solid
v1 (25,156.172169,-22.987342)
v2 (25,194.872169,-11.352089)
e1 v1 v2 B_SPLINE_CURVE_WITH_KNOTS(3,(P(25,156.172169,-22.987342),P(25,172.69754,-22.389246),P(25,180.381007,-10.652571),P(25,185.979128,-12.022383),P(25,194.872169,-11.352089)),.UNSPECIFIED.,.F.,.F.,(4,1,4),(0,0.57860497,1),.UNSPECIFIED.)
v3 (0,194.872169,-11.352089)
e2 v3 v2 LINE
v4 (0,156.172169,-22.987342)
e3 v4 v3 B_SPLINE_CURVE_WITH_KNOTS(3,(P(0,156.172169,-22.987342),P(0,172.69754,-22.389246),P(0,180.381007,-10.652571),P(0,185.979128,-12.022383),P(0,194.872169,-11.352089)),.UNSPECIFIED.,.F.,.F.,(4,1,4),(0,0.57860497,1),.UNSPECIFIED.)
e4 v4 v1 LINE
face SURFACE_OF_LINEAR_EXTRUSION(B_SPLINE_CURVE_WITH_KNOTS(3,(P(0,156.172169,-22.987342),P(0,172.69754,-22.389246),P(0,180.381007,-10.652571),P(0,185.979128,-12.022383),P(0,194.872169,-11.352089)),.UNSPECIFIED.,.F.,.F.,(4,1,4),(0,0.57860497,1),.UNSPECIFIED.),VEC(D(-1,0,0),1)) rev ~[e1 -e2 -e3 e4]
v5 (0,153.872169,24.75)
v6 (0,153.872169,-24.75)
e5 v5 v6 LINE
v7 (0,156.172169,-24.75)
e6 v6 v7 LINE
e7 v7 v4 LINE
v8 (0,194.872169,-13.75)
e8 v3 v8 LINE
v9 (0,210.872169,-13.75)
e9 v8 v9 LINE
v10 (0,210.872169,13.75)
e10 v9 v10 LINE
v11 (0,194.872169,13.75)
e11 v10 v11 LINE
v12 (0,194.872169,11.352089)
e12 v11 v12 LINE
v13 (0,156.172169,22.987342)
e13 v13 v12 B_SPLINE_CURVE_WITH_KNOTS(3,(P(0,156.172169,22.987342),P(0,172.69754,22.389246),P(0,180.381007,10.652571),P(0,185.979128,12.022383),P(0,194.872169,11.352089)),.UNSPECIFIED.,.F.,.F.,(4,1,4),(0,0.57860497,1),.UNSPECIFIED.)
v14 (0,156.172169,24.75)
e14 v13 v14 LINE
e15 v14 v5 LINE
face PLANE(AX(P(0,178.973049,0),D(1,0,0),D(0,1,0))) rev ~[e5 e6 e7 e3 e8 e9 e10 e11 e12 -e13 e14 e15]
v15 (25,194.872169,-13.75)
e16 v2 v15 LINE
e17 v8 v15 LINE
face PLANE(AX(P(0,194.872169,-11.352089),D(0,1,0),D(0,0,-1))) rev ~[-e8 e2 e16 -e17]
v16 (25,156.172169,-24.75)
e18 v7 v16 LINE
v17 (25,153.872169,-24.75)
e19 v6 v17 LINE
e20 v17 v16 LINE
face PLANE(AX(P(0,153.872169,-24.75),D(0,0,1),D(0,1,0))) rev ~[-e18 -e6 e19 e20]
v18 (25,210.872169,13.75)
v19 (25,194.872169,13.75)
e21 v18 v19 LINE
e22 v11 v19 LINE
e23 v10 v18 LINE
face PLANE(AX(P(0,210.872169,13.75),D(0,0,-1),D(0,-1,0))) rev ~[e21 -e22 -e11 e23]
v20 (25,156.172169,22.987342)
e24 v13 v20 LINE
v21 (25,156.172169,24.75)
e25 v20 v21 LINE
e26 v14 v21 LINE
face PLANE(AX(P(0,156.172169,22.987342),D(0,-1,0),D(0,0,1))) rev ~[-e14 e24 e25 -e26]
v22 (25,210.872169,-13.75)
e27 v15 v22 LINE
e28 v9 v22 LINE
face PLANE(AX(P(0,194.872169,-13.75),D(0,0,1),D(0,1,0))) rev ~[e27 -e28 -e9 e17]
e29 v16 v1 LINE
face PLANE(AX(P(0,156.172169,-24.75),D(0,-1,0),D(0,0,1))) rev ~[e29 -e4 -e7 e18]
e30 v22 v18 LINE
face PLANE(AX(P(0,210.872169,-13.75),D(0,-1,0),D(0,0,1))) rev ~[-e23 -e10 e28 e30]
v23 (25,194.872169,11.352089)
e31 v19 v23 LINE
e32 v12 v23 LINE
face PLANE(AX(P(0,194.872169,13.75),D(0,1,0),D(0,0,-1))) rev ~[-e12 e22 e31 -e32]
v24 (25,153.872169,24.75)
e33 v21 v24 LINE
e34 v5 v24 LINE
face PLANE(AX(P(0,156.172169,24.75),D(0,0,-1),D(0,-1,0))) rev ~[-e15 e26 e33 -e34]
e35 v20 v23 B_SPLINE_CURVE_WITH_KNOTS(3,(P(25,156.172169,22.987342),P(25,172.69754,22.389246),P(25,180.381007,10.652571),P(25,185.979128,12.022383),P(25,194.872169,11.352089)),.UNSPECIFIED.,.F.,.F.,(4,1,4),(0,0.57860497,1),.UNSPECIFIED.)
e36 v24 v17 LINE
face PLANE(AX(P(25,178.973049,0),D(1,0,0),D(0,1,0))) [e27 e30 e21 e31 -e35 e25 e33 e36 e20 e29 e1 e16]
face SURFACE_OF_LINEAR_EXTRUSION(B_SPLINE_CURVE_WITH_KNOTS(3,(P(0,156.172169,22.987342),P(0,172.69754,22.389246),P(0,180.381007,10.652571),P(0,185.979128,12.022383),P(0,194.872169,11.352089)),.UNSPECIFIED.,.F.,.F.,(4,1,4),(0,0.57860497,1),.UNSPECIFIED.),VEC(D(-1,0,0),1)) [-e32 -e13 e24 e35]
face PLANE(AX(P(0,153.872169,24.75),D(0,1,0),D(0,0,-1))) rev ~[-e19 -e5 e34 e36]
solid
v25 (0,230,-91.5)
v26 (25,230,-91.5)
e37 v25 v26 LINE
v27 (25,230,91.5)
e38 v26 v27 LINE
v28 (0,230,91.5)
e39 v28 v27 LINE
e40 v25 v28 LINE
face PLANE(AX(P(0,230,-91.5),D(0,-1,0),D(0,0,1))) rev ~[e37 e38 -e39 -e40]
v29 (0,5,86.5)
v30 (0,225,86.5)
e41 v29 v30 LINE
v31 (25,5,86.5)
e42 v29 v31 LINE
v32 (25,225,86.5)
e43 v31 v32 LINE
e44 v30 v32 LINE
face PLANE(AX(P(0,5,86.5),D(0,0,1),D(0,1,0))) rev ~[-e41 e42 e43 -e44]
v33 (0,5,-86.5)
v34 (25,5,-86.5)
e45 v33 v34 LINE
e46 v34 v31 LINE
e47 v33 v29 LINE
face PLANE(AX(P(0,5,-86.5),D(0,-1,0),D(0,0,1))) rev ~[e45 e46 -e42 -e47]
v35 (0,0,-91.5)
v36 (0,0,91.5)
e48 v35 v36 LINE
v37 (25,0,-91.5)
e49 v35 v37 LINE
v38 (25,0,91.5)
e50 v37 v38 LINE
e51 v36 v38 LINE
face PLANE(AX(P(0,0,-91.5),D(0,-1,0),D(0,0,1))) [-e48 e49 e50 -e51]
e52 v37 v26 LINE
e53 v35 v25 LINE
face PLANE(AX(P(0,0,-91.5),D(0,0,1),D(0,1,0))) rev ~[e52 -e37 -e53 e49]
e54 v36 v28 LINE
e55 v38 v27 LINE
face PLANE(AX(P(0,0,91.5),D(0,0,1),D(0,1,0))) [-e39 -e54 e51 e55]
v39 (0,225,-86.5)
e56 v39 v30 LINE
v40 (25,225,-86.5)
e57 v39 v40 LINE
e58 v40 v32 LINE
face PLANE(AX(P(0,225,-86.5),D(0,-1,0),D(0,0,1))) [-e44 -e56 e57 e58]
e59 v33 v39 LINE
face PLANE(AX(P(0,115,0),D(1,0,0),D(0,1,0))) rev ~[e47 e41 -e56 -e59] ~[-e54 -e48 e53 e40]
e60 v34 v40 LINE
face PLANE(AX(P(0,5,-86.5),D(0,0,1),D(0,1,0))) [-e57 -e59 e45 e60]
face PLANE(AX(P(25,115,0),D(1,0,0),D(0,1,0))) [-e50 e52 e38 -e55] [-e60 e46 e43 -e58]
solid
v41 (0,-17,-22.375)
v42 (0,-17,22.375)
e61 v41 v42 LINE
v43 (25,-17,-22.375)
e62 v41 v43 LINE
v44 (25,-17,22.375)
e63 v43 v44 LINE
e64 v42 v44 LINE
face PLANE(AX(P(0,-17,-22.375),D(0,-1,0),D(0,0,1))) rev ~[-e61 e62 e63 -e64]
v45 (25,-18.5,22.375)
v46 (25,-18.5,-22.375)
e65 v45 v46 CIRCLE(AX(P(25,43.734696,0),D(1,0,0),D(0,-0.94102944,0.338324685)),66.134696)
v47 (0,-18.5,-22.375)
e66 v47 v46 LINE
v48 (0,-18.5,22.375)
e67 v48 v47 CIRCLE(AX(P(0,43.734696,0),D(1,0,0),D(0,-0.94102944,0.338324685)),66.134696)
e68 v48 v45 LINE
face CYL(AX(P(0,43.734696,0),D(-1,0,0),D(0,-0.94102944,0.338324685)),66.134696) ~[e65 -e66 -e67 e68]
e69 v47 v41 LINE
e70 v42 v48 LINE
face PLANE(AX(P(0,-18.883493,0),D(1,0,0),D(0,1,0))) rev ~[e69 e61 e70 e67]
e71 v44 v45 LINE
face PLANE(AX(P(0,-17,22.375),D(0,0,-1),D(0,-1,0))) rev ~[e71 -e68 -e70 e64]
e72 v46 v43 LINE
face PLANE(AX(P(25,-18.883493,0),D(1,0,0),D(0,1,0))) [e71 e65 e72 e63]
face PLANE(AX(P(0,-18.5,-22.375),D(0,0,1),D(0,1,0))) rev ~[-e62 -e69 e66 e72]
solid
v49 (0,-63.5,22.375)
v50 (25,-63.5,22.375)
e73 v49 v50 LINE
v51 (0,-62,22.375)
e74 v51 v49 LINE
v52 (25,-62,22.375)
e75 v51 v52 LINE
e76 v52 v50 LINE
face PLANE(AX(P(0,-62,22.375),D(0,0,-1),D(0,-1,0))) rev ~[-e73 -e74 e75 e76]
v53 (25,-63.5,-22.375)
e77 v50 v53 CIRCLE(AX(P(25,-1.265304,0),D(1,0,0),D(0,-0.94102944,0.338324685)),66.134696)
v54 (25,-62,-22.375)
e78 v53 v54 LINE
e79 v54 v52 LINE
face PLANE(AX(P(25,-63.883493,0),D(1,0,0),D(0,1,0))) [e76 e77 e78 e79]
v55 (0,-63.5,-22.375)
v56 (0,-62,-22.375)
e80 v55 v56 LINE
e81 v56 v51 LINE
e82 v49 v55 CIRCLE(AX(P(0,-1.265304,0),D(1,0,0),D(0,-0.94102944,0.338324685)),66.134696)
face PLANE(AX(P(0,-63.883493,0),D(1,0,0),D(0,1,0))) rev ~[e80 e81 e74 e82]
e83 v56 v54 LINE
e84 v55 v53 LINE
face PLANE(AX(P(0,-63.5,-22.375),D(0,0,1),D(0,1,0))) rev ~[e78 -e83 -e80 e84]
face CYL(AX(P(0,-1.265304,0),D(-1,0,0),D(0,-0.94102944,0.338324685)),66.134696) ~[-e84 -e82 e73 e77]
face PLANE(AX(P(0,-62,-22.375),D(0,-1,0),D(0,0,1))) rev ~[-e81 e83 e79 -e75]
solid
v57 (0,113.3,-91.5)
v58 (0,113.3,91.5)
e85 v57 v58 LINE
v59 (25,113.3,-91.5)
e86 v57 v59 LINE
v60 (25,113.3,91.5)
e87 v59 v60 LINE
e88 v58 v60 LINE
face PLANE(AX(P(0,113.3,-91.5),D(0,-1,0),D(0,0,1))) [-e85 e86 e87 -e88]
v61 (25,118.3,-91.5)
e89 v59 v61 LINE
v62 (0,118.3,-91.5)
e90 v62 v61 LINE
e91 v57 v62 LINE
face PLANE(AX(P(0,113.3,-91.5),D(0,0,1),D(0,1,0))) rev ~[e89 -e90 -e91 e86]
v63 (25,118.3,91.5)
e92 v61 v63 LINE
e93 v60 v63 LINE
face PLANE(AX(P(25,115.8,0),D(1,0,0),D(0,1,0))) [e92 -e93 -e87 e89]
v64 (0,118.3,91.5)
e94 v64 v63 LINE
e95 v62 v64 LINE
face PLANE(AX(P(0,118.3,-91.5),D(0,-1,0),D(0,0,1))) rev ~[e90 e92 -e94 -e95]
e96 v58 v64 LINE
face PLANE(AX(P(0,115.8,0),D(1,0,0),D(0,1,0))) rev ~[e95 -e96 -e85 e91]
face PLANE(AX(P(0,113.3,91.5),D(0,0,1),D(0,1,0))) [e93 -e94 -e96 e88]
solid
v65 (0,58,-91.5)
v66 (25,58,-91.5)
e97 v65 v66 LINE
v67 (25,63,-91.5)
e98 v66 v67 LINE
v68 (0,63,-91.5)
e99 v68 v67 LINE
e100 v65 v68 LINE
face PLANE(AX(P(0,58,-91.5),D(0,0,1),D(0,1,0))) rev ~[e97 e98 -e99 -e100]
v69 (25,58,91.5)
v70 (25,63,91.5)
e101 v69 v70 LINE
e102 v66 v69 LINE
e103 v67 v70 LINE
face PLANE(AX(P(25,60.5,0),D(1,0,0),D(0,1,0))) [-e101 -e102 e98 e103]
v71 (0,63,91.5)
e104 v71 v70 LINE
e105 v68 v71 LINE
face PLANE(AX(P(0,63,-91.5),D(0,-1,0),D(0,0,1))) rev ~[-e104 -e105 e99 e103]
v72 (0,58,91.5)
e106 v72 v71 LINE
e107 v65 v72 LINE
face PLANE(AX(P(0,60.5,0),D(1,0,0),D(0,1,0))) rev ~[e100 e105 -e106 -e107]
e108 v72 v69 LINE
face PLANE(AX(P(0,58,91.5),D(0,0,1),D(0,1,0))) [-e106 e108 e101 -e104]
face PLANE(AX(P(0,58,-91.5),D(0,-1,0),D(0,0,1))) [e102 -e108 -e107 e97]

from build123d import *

# Parameters (mm, degrees)
F3_W     = 230
F3_H     = 183
F3_W_2   = 220
F3_H_2   = 173
F4_DEPTH = 25
F5_DEPTH = 25
F6_W     = 5
F6_H     = 183
F7_DEPTH = 25


# Not quite as in the source:
# - the dataset's text gives a spline's control points without its knots; the knots are read off the source's solid


with BuildPart() as f4:
    # F3 (on Right) → F4 (new body)
    with BuildSketch(Plane.YZ):
        with Locations((115, 0)):
            Rectangle(F3_W, F3_H)
        with Locations((115, 0)):
            Rectangle(F3_W_2, F3_H_2, mode=Mode.SUBTRACT)
    extrude(amount=F4_DEPTH)


with BuildPart() as f5:
    # F2 (on Right) → F5 (new body)
    with BuildSketch(Plane.YZ):
        with BuildLine():
            Line((210.8721694193, -13.75), (210.8721694193, 13.75))
            Line((210.8721694193, 13.75), (194.8721694193, 13.75))
            Line((194.8721694193, 13.75), (194.8721694193, 11.3520892337))
            add(Edge.make_bspline(
                [(156.1721694193, 22.9873415195), (172.6975398433, 22.3892458961), (180.3810074103, 10.6525710072), (185.9791283701, 12.0223834249), (194.8721694193, 11.3520892337)],
                knots=[0, 0, 0, 0, 0.5786049699, 1, 1, 1, 1], degree=3))
            Line((156.1721694193, 22.9873415195), (156.1721694193, 24.75))
            Line((156.1721694193, 24.75), (153.8721694193, 24.75))
            Line((153.8721694193, 24.75), (153.8721694193, -24.75))
            Line((153.8721694193, -24.75), (156.1721694193, -24.75))
            Line((156.1721694193, -24.75), (156.1721694193, -22.9873415195))
            add(Edge.make_bspline(
                [(156.1721694193, -22.9873415195), (172.6975398433, -22.3892458961), (180.3810074103, -10.6525710072), (185.9791283701, -12.0223834249), (194.8721694193, -11.3520892337)],
                knots=[0, 0, 0, 0, 0.5786049699, 1, 1, 1, 1], degree=3))
            Line((194.8721694193, -11.3520892337), (194.8721694193, -13.75))
            Line((194.8721694193, -13.75), (210.8721694193, -13.75))
        make_face()
    extrude(amount=F5_DEPTH)


with BuildPart() as f5b:
    # F2 (on Right) → F5, piece 2 (new body)
    with BuildSketch(Plane.YZ):
        with BuildLine():
            Line((-17, 22.375), (-18.5, 22.375))
            ThreePointArc((-18.5, 22.375), (-22.4, 0), (-18.5, -22.375))
            Line((-18.5, -22.375), (-17, -22.375))
            Line((-17, -22.375), (-17, 22.375))
        make_face()
    extrude(amount=F5_DEPTH)


with BuildPart() as f5c:
    # F2 (on Right) → F5, piece 3 (new body)
    with BuildSketch(Plane.YZ):
        with BuildLine():
            Line((-62, 22.375), (-63.5, 22.375))
            ThreePointArc((-63.5, 22.375), (-67.4, 0), (-63.5, -22.375))
            Line((-63.5, -22.375), (-62, -22.375))
            Line((-62, -22.375), (-62, 22.375))
        make_face()
    extrude(amount=F5_DEPTH)


with BuildPart() as f7:
    # F6 (on Right) → F7 (new body)
    with BuildSketch(Plane.YZ):
        with Locations((60.5, 0)):
            Rectangle(F6_W, F6_H)
    extrude(amount=F7_DEPTH)


with BuildPart() as f7b:
    # F6 (on Right) → F7, piece 2 (new body)
    with BuildSketch(Plane.YZ):
        with Locations((115.8, 0)):
            Rectangle(F6_W, F6_H)
    extrude(amount=F7_DEPTH)


solid = Compound([f4.part, f5.part, f5b.part, f5c.part, f7.part, f7b.part])
